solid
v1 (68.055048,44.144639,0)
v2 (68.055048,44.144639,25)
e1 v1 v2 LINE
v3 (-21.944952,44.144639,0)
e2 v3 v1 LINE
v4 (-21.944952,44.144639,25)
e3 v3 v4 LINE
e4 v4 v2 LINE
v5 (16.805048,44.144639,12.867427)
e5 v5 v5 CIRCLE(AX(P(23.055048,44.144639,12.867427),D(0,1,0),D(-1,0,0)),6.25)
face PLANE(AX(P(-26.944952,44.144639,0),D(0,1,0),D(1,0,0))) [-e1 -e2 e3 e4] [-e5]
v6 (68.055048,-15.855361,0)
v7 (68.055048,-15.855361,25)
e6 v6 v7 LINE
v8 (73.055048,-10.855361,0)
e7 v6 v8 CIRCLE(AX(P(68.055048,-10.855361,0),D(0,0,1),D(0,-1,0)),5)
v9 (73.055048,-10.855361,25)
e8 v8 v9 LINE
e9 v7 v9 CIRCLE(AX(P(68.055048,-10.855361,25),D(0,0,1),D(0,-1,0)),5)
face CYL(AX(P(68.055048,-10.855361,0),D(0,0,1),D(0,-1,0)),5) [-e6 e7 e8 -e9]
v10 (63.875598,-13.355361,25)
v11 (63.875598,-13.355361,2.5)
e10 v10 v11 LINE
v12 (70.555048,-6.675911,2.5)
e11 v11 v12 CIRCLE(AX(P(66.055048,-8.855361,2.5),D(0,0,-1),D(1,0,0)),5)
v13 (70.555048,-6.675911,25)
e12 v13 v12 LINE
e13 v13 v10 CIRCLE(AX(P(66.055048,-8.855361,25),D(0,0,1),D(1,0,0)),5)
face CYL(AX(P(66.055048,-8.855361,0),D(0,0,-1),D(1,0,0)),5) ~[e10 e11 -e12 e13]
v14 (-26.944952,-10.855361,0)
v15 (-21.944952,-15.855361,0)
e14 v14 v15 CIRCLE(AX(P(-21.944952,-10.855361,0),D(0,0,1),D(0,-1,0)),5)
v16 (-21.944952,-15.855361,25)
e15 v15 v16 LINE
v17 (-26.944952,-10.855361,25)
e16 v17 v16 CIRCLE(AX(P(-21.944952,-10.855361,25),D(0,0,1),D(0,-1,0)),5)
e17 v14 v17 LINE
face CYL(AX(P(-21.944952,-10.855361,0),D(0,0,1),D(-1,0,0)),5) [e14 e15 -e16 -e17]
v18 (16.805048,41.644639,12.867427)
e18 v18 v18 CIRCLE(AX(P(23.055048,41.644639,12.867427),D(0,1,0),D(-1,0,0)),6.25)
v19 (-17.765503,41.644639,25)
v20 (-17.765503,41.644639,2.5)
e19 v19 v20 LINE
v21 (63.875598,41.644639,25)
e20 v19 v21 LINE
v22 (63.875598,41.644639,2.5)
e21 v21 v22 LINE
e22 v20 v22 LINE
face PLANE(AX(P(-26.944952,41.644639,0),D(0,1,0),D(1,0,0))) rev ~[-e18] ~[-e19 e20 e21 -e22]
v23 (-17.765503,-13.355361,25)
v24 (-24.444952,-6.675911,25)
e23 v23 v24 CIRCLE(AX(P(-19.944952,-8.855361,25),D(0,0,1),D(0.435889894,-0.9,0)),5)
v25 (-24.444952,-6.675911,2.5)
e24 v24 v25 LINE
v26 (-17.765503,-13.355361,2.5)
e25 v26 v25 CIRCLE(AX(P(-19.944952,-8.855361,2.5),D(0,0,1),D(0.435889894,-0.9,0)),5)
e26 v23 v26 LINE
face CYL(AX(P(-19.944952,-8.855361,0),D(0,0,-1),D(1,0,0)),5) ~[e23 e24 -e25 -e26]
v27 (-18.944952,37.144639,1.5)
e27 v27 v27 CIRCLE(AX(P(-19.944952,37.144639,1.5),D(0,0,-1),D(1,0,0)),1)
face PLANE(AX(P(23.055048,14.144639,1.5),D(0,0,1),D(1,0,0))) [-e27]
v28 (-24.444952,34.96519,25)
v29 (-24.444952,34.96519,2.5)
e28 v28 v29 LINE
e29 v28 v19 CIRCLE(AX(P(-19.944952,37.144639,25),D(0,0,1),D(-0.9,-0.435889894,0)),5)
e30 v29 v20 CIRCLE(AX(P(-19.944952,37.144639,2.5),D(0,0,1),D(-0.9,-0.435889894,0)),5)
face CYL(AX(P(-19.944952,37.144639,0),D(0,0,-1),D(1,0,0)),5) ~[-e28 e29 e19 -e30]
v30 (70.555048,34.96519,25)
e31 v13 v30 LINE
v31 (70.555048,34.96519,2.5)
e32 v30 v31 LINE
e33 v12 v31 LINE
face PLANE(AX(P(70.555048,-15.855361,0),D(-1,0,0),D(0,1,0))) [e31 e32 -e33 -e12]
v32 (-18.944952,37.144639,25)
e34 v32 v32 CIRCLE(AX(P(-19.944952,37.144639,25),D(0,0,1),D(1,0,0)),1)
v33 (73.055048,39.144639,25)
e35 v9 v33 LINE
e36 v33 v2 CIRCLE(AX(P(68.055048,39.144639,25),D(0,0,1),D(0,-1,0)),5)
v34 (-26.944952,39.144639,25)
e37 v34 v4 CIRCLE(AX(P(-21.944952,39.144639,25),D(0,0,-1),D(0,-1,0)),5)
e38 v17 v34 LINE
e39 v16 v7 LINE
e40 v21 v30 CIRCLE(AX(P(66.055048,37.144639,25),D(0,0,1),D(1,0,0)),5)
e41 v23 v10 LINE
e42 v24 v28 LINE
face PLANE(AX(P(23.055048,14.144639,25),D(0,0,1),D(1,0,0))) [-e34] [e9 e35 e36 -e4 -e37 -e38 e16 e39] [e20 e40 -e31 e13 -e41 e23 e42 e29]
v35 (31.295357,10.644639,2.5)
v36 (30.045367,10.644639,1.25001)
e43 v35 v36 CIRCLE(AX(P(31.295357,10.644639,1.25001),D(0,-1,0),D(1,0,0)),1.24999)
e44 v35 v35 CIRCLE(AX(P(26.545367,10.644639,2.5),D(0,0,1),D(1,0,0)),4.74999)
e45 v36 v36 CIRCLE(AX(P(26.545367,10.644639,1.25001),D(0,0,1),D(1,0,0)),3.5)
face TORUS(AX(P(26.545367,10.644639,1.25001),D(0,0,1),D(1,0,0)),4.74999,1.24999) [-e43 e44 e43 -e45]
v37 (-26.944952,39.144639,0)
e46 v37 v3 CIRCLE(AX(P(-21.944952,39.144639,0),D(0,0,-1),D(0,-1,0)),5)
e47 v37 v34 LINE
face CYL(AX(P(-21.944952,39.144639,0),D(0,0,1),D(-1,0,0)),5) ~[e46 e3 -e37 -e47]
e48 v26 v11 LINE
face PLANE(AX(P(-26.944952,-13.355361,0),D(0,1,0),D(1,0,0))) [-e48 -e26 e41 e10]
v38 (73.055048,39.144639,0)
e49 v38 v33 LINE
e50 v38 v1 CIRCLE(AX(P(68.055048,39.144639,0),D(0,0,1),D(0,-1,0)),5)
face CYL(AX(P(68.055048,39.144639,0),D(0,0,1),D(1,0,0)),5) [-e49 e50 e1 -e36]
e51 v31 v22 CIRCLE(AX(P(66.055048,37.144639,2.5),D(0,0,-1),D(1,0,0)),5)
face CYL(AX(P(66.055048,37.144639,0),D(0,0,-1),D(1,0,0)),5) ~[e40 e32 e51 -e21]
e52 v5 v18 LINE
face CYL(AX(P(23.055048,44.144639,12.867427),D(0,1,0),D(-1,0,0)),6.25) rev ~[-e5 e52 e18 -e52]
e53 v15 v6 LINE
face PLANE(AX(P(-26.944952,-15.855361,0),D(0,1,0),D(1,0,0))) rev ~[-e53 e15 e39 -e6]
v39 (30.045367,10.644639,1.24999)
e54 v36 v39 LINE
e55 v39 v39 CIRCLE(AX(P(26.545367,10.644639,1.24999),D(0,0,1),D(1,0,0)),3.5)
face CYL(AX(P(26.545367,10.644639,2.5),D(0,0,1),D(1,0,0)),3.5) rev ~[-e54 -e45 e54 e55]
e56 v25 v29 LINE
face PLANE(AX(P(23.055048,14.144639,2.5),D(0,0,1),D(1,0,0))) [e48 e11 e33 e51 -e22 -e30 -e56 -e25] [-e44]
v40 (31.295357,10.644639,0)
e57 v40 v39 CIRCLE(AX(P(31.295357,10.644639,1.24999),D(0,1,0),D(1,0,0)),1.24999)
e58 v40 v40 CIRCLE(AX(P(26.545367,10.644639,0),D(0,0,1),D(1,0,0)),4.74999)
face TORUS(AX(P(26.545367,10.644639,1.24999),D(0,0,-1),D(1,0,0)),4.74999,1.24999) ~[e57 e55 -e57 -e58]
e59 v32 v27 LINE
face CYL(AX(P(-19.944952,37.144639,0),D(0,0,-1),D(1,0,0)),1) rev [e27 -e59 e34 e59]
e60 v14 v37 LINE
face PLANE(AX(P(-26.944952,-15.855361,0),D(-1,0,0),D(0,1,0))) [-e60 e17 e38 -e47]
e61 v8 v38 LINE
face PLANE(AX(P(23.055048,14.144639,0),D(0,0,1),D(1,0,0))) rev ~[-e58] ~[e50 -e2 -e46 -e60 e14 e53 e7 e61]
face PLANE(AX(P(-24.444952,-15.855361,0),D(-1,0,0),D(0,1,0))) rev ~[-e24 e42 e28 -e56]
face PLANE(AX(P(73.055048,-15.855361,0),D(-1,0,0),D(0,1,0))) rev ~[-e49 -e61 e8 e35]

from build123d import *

# Parameters (mm, degrees)
F0_W           = 100
F0_H           = 60
F1_DEPTH       = 25
F2_T           = -2.5
F3_R           = 5
F4_R           = 5
F5_R           = 3.5
F6_DEPTH       = 25
F7_R           = 1.24999
F8_R           = 5
F8_R_2         = 1
F9_DEPTH       = 25
F10_DEPTH      = 1
F10_DEPTH_BACK = 1
F11_R          = 5
F12_DEPTH      = 25
F13_R          = 5
F14_DEPTH      = 25
F15_R          = 5
F16_DEPTH      = 25
F17_R          = 6.25
F18_DEPTH      = 10


# Not quite as in the source:
# - a fillet or chamfer is up to 0.001 mm smaller than in the source, because OpenCascade refuses the exact size


with BuildPart() as f1:
    # F0 (on Top) → F1 (new body)
    with BuildSketch(Plane.XY):
        with Locations((23.0550479144, 14.1446392238)):
            Rectangle(F0_W, F0_H)
    extrude(amount=F1_DEPTH)

    # F2
    f2_openings = [f1.faces().sort_by_distance(p)[0] for p in [
        (23.055048, 14.144639, 25),
    ]]
    offset(amount=F2_T, openings=f2_openings)

    # F3
    f3_edges = [f1.edges().sort_by_distance(p)[0] for p in [
        (-26.944952, 44.144639, 12.5),
        (-26.944952, -15.855361, 12.5),
        (73.055048, -15.855361, 12.5),
        (73.055048, 44.144639, 12.5),
    ]]
    fillet(f3_edges, radius=F3_R)

    # F4
    f4_edges = [f1.edges().sort_by_distance(p)[0] for p in [
        (70.555048, -13.355361, 13.75),
        (-24.444952, 41.644639, 13.75),
        (-24.444952, -13.355361, 13.75),
        (70.555048, 41.644639, 13.75),
    ]]
    fillet(f4_edges, radius=F4_R)

    # F5 (on face) → F6 (cut)
    with BuildSketch(Plane.XY.offset(2.5)):
        with Locations((26.5453665042, 10.6446392238)):
            Circle(F5_R)
    extrude(amount=-F6_DEPTH, mode=Mode.SUBTRACT)

    # F7 (radius 1.25 in the source; OpenCascade refuses exactly that, so slightly less here)
    f7_edges = [f1.edges().sort_by_distance(p)[0] for p in [
        (23.045367, 10.644639, 0),
        (23.045367, 10.644639, 2.5),
    ]]
    fillet(f7_edges, radius=F7_R)

    # F8 (on face) → F9 (join)
    with BuildSketch(Plane.XY):
        with Locations((-19.9449520856, 37.1446392238)):
            Circle(F8_R)
        with Locations((-19.9449520856, 37.1446392238)):
            Circle(F8_R_2, mode=Mode.SUBTRACT)
    extrude(amount=F9_DEPTH)

    # F10 (cut, two sides): a face of the model
    f10_faces = [f1.faces().sort_by_distance(p)[0] for p in [
        (-19.9449520856, 37.1446392238, 2.5),
    ]]
    extrude(f10_faces, amount=-F10_DEPTH, mode=Mode.SUBTRACT)
    extrude(f10_faces, amount=F10_DEPTH_BACK, mode=Mode.SUBTRACT)

    # F11 (on face) → F12 (join)
    with BuildSketch(Plane.XY):
        with Locations((66.0550479144, 37.1446392238)):
            Circle(F11_R)
    extrude(amount=F12_DEPTH)

    # F13 (on face) → F14 (join)
    with BuildSketch(Plane.XY):
        with Locations((-19.9449520856, -8.8553607762)):
            Circle(F13_R)
    extrude(amount=F14_DEPTH)

    # F15 (on face) → F16 (join)
    with BuildSketch(Plane.XY):
        with Locations((66.0550479144, -8.8553607762)):
            Circle(F15_R)
    extrude(amount=F16_DEPTH)

    # F17 (on face) → F18 (cut)
    with BuildSketch(Plane(origin=(0, 44.1446392238, 0), x_dir=(-1, 0, 0), z_dir=(0, 1, 0))):
        with Locations((-23.0550479144, 12.8674265233)):
            Circle(F17_R)
    extrude(amount=-F18_DEPTH, mode=Mode.SUBTRACT)


solid = f1.part
